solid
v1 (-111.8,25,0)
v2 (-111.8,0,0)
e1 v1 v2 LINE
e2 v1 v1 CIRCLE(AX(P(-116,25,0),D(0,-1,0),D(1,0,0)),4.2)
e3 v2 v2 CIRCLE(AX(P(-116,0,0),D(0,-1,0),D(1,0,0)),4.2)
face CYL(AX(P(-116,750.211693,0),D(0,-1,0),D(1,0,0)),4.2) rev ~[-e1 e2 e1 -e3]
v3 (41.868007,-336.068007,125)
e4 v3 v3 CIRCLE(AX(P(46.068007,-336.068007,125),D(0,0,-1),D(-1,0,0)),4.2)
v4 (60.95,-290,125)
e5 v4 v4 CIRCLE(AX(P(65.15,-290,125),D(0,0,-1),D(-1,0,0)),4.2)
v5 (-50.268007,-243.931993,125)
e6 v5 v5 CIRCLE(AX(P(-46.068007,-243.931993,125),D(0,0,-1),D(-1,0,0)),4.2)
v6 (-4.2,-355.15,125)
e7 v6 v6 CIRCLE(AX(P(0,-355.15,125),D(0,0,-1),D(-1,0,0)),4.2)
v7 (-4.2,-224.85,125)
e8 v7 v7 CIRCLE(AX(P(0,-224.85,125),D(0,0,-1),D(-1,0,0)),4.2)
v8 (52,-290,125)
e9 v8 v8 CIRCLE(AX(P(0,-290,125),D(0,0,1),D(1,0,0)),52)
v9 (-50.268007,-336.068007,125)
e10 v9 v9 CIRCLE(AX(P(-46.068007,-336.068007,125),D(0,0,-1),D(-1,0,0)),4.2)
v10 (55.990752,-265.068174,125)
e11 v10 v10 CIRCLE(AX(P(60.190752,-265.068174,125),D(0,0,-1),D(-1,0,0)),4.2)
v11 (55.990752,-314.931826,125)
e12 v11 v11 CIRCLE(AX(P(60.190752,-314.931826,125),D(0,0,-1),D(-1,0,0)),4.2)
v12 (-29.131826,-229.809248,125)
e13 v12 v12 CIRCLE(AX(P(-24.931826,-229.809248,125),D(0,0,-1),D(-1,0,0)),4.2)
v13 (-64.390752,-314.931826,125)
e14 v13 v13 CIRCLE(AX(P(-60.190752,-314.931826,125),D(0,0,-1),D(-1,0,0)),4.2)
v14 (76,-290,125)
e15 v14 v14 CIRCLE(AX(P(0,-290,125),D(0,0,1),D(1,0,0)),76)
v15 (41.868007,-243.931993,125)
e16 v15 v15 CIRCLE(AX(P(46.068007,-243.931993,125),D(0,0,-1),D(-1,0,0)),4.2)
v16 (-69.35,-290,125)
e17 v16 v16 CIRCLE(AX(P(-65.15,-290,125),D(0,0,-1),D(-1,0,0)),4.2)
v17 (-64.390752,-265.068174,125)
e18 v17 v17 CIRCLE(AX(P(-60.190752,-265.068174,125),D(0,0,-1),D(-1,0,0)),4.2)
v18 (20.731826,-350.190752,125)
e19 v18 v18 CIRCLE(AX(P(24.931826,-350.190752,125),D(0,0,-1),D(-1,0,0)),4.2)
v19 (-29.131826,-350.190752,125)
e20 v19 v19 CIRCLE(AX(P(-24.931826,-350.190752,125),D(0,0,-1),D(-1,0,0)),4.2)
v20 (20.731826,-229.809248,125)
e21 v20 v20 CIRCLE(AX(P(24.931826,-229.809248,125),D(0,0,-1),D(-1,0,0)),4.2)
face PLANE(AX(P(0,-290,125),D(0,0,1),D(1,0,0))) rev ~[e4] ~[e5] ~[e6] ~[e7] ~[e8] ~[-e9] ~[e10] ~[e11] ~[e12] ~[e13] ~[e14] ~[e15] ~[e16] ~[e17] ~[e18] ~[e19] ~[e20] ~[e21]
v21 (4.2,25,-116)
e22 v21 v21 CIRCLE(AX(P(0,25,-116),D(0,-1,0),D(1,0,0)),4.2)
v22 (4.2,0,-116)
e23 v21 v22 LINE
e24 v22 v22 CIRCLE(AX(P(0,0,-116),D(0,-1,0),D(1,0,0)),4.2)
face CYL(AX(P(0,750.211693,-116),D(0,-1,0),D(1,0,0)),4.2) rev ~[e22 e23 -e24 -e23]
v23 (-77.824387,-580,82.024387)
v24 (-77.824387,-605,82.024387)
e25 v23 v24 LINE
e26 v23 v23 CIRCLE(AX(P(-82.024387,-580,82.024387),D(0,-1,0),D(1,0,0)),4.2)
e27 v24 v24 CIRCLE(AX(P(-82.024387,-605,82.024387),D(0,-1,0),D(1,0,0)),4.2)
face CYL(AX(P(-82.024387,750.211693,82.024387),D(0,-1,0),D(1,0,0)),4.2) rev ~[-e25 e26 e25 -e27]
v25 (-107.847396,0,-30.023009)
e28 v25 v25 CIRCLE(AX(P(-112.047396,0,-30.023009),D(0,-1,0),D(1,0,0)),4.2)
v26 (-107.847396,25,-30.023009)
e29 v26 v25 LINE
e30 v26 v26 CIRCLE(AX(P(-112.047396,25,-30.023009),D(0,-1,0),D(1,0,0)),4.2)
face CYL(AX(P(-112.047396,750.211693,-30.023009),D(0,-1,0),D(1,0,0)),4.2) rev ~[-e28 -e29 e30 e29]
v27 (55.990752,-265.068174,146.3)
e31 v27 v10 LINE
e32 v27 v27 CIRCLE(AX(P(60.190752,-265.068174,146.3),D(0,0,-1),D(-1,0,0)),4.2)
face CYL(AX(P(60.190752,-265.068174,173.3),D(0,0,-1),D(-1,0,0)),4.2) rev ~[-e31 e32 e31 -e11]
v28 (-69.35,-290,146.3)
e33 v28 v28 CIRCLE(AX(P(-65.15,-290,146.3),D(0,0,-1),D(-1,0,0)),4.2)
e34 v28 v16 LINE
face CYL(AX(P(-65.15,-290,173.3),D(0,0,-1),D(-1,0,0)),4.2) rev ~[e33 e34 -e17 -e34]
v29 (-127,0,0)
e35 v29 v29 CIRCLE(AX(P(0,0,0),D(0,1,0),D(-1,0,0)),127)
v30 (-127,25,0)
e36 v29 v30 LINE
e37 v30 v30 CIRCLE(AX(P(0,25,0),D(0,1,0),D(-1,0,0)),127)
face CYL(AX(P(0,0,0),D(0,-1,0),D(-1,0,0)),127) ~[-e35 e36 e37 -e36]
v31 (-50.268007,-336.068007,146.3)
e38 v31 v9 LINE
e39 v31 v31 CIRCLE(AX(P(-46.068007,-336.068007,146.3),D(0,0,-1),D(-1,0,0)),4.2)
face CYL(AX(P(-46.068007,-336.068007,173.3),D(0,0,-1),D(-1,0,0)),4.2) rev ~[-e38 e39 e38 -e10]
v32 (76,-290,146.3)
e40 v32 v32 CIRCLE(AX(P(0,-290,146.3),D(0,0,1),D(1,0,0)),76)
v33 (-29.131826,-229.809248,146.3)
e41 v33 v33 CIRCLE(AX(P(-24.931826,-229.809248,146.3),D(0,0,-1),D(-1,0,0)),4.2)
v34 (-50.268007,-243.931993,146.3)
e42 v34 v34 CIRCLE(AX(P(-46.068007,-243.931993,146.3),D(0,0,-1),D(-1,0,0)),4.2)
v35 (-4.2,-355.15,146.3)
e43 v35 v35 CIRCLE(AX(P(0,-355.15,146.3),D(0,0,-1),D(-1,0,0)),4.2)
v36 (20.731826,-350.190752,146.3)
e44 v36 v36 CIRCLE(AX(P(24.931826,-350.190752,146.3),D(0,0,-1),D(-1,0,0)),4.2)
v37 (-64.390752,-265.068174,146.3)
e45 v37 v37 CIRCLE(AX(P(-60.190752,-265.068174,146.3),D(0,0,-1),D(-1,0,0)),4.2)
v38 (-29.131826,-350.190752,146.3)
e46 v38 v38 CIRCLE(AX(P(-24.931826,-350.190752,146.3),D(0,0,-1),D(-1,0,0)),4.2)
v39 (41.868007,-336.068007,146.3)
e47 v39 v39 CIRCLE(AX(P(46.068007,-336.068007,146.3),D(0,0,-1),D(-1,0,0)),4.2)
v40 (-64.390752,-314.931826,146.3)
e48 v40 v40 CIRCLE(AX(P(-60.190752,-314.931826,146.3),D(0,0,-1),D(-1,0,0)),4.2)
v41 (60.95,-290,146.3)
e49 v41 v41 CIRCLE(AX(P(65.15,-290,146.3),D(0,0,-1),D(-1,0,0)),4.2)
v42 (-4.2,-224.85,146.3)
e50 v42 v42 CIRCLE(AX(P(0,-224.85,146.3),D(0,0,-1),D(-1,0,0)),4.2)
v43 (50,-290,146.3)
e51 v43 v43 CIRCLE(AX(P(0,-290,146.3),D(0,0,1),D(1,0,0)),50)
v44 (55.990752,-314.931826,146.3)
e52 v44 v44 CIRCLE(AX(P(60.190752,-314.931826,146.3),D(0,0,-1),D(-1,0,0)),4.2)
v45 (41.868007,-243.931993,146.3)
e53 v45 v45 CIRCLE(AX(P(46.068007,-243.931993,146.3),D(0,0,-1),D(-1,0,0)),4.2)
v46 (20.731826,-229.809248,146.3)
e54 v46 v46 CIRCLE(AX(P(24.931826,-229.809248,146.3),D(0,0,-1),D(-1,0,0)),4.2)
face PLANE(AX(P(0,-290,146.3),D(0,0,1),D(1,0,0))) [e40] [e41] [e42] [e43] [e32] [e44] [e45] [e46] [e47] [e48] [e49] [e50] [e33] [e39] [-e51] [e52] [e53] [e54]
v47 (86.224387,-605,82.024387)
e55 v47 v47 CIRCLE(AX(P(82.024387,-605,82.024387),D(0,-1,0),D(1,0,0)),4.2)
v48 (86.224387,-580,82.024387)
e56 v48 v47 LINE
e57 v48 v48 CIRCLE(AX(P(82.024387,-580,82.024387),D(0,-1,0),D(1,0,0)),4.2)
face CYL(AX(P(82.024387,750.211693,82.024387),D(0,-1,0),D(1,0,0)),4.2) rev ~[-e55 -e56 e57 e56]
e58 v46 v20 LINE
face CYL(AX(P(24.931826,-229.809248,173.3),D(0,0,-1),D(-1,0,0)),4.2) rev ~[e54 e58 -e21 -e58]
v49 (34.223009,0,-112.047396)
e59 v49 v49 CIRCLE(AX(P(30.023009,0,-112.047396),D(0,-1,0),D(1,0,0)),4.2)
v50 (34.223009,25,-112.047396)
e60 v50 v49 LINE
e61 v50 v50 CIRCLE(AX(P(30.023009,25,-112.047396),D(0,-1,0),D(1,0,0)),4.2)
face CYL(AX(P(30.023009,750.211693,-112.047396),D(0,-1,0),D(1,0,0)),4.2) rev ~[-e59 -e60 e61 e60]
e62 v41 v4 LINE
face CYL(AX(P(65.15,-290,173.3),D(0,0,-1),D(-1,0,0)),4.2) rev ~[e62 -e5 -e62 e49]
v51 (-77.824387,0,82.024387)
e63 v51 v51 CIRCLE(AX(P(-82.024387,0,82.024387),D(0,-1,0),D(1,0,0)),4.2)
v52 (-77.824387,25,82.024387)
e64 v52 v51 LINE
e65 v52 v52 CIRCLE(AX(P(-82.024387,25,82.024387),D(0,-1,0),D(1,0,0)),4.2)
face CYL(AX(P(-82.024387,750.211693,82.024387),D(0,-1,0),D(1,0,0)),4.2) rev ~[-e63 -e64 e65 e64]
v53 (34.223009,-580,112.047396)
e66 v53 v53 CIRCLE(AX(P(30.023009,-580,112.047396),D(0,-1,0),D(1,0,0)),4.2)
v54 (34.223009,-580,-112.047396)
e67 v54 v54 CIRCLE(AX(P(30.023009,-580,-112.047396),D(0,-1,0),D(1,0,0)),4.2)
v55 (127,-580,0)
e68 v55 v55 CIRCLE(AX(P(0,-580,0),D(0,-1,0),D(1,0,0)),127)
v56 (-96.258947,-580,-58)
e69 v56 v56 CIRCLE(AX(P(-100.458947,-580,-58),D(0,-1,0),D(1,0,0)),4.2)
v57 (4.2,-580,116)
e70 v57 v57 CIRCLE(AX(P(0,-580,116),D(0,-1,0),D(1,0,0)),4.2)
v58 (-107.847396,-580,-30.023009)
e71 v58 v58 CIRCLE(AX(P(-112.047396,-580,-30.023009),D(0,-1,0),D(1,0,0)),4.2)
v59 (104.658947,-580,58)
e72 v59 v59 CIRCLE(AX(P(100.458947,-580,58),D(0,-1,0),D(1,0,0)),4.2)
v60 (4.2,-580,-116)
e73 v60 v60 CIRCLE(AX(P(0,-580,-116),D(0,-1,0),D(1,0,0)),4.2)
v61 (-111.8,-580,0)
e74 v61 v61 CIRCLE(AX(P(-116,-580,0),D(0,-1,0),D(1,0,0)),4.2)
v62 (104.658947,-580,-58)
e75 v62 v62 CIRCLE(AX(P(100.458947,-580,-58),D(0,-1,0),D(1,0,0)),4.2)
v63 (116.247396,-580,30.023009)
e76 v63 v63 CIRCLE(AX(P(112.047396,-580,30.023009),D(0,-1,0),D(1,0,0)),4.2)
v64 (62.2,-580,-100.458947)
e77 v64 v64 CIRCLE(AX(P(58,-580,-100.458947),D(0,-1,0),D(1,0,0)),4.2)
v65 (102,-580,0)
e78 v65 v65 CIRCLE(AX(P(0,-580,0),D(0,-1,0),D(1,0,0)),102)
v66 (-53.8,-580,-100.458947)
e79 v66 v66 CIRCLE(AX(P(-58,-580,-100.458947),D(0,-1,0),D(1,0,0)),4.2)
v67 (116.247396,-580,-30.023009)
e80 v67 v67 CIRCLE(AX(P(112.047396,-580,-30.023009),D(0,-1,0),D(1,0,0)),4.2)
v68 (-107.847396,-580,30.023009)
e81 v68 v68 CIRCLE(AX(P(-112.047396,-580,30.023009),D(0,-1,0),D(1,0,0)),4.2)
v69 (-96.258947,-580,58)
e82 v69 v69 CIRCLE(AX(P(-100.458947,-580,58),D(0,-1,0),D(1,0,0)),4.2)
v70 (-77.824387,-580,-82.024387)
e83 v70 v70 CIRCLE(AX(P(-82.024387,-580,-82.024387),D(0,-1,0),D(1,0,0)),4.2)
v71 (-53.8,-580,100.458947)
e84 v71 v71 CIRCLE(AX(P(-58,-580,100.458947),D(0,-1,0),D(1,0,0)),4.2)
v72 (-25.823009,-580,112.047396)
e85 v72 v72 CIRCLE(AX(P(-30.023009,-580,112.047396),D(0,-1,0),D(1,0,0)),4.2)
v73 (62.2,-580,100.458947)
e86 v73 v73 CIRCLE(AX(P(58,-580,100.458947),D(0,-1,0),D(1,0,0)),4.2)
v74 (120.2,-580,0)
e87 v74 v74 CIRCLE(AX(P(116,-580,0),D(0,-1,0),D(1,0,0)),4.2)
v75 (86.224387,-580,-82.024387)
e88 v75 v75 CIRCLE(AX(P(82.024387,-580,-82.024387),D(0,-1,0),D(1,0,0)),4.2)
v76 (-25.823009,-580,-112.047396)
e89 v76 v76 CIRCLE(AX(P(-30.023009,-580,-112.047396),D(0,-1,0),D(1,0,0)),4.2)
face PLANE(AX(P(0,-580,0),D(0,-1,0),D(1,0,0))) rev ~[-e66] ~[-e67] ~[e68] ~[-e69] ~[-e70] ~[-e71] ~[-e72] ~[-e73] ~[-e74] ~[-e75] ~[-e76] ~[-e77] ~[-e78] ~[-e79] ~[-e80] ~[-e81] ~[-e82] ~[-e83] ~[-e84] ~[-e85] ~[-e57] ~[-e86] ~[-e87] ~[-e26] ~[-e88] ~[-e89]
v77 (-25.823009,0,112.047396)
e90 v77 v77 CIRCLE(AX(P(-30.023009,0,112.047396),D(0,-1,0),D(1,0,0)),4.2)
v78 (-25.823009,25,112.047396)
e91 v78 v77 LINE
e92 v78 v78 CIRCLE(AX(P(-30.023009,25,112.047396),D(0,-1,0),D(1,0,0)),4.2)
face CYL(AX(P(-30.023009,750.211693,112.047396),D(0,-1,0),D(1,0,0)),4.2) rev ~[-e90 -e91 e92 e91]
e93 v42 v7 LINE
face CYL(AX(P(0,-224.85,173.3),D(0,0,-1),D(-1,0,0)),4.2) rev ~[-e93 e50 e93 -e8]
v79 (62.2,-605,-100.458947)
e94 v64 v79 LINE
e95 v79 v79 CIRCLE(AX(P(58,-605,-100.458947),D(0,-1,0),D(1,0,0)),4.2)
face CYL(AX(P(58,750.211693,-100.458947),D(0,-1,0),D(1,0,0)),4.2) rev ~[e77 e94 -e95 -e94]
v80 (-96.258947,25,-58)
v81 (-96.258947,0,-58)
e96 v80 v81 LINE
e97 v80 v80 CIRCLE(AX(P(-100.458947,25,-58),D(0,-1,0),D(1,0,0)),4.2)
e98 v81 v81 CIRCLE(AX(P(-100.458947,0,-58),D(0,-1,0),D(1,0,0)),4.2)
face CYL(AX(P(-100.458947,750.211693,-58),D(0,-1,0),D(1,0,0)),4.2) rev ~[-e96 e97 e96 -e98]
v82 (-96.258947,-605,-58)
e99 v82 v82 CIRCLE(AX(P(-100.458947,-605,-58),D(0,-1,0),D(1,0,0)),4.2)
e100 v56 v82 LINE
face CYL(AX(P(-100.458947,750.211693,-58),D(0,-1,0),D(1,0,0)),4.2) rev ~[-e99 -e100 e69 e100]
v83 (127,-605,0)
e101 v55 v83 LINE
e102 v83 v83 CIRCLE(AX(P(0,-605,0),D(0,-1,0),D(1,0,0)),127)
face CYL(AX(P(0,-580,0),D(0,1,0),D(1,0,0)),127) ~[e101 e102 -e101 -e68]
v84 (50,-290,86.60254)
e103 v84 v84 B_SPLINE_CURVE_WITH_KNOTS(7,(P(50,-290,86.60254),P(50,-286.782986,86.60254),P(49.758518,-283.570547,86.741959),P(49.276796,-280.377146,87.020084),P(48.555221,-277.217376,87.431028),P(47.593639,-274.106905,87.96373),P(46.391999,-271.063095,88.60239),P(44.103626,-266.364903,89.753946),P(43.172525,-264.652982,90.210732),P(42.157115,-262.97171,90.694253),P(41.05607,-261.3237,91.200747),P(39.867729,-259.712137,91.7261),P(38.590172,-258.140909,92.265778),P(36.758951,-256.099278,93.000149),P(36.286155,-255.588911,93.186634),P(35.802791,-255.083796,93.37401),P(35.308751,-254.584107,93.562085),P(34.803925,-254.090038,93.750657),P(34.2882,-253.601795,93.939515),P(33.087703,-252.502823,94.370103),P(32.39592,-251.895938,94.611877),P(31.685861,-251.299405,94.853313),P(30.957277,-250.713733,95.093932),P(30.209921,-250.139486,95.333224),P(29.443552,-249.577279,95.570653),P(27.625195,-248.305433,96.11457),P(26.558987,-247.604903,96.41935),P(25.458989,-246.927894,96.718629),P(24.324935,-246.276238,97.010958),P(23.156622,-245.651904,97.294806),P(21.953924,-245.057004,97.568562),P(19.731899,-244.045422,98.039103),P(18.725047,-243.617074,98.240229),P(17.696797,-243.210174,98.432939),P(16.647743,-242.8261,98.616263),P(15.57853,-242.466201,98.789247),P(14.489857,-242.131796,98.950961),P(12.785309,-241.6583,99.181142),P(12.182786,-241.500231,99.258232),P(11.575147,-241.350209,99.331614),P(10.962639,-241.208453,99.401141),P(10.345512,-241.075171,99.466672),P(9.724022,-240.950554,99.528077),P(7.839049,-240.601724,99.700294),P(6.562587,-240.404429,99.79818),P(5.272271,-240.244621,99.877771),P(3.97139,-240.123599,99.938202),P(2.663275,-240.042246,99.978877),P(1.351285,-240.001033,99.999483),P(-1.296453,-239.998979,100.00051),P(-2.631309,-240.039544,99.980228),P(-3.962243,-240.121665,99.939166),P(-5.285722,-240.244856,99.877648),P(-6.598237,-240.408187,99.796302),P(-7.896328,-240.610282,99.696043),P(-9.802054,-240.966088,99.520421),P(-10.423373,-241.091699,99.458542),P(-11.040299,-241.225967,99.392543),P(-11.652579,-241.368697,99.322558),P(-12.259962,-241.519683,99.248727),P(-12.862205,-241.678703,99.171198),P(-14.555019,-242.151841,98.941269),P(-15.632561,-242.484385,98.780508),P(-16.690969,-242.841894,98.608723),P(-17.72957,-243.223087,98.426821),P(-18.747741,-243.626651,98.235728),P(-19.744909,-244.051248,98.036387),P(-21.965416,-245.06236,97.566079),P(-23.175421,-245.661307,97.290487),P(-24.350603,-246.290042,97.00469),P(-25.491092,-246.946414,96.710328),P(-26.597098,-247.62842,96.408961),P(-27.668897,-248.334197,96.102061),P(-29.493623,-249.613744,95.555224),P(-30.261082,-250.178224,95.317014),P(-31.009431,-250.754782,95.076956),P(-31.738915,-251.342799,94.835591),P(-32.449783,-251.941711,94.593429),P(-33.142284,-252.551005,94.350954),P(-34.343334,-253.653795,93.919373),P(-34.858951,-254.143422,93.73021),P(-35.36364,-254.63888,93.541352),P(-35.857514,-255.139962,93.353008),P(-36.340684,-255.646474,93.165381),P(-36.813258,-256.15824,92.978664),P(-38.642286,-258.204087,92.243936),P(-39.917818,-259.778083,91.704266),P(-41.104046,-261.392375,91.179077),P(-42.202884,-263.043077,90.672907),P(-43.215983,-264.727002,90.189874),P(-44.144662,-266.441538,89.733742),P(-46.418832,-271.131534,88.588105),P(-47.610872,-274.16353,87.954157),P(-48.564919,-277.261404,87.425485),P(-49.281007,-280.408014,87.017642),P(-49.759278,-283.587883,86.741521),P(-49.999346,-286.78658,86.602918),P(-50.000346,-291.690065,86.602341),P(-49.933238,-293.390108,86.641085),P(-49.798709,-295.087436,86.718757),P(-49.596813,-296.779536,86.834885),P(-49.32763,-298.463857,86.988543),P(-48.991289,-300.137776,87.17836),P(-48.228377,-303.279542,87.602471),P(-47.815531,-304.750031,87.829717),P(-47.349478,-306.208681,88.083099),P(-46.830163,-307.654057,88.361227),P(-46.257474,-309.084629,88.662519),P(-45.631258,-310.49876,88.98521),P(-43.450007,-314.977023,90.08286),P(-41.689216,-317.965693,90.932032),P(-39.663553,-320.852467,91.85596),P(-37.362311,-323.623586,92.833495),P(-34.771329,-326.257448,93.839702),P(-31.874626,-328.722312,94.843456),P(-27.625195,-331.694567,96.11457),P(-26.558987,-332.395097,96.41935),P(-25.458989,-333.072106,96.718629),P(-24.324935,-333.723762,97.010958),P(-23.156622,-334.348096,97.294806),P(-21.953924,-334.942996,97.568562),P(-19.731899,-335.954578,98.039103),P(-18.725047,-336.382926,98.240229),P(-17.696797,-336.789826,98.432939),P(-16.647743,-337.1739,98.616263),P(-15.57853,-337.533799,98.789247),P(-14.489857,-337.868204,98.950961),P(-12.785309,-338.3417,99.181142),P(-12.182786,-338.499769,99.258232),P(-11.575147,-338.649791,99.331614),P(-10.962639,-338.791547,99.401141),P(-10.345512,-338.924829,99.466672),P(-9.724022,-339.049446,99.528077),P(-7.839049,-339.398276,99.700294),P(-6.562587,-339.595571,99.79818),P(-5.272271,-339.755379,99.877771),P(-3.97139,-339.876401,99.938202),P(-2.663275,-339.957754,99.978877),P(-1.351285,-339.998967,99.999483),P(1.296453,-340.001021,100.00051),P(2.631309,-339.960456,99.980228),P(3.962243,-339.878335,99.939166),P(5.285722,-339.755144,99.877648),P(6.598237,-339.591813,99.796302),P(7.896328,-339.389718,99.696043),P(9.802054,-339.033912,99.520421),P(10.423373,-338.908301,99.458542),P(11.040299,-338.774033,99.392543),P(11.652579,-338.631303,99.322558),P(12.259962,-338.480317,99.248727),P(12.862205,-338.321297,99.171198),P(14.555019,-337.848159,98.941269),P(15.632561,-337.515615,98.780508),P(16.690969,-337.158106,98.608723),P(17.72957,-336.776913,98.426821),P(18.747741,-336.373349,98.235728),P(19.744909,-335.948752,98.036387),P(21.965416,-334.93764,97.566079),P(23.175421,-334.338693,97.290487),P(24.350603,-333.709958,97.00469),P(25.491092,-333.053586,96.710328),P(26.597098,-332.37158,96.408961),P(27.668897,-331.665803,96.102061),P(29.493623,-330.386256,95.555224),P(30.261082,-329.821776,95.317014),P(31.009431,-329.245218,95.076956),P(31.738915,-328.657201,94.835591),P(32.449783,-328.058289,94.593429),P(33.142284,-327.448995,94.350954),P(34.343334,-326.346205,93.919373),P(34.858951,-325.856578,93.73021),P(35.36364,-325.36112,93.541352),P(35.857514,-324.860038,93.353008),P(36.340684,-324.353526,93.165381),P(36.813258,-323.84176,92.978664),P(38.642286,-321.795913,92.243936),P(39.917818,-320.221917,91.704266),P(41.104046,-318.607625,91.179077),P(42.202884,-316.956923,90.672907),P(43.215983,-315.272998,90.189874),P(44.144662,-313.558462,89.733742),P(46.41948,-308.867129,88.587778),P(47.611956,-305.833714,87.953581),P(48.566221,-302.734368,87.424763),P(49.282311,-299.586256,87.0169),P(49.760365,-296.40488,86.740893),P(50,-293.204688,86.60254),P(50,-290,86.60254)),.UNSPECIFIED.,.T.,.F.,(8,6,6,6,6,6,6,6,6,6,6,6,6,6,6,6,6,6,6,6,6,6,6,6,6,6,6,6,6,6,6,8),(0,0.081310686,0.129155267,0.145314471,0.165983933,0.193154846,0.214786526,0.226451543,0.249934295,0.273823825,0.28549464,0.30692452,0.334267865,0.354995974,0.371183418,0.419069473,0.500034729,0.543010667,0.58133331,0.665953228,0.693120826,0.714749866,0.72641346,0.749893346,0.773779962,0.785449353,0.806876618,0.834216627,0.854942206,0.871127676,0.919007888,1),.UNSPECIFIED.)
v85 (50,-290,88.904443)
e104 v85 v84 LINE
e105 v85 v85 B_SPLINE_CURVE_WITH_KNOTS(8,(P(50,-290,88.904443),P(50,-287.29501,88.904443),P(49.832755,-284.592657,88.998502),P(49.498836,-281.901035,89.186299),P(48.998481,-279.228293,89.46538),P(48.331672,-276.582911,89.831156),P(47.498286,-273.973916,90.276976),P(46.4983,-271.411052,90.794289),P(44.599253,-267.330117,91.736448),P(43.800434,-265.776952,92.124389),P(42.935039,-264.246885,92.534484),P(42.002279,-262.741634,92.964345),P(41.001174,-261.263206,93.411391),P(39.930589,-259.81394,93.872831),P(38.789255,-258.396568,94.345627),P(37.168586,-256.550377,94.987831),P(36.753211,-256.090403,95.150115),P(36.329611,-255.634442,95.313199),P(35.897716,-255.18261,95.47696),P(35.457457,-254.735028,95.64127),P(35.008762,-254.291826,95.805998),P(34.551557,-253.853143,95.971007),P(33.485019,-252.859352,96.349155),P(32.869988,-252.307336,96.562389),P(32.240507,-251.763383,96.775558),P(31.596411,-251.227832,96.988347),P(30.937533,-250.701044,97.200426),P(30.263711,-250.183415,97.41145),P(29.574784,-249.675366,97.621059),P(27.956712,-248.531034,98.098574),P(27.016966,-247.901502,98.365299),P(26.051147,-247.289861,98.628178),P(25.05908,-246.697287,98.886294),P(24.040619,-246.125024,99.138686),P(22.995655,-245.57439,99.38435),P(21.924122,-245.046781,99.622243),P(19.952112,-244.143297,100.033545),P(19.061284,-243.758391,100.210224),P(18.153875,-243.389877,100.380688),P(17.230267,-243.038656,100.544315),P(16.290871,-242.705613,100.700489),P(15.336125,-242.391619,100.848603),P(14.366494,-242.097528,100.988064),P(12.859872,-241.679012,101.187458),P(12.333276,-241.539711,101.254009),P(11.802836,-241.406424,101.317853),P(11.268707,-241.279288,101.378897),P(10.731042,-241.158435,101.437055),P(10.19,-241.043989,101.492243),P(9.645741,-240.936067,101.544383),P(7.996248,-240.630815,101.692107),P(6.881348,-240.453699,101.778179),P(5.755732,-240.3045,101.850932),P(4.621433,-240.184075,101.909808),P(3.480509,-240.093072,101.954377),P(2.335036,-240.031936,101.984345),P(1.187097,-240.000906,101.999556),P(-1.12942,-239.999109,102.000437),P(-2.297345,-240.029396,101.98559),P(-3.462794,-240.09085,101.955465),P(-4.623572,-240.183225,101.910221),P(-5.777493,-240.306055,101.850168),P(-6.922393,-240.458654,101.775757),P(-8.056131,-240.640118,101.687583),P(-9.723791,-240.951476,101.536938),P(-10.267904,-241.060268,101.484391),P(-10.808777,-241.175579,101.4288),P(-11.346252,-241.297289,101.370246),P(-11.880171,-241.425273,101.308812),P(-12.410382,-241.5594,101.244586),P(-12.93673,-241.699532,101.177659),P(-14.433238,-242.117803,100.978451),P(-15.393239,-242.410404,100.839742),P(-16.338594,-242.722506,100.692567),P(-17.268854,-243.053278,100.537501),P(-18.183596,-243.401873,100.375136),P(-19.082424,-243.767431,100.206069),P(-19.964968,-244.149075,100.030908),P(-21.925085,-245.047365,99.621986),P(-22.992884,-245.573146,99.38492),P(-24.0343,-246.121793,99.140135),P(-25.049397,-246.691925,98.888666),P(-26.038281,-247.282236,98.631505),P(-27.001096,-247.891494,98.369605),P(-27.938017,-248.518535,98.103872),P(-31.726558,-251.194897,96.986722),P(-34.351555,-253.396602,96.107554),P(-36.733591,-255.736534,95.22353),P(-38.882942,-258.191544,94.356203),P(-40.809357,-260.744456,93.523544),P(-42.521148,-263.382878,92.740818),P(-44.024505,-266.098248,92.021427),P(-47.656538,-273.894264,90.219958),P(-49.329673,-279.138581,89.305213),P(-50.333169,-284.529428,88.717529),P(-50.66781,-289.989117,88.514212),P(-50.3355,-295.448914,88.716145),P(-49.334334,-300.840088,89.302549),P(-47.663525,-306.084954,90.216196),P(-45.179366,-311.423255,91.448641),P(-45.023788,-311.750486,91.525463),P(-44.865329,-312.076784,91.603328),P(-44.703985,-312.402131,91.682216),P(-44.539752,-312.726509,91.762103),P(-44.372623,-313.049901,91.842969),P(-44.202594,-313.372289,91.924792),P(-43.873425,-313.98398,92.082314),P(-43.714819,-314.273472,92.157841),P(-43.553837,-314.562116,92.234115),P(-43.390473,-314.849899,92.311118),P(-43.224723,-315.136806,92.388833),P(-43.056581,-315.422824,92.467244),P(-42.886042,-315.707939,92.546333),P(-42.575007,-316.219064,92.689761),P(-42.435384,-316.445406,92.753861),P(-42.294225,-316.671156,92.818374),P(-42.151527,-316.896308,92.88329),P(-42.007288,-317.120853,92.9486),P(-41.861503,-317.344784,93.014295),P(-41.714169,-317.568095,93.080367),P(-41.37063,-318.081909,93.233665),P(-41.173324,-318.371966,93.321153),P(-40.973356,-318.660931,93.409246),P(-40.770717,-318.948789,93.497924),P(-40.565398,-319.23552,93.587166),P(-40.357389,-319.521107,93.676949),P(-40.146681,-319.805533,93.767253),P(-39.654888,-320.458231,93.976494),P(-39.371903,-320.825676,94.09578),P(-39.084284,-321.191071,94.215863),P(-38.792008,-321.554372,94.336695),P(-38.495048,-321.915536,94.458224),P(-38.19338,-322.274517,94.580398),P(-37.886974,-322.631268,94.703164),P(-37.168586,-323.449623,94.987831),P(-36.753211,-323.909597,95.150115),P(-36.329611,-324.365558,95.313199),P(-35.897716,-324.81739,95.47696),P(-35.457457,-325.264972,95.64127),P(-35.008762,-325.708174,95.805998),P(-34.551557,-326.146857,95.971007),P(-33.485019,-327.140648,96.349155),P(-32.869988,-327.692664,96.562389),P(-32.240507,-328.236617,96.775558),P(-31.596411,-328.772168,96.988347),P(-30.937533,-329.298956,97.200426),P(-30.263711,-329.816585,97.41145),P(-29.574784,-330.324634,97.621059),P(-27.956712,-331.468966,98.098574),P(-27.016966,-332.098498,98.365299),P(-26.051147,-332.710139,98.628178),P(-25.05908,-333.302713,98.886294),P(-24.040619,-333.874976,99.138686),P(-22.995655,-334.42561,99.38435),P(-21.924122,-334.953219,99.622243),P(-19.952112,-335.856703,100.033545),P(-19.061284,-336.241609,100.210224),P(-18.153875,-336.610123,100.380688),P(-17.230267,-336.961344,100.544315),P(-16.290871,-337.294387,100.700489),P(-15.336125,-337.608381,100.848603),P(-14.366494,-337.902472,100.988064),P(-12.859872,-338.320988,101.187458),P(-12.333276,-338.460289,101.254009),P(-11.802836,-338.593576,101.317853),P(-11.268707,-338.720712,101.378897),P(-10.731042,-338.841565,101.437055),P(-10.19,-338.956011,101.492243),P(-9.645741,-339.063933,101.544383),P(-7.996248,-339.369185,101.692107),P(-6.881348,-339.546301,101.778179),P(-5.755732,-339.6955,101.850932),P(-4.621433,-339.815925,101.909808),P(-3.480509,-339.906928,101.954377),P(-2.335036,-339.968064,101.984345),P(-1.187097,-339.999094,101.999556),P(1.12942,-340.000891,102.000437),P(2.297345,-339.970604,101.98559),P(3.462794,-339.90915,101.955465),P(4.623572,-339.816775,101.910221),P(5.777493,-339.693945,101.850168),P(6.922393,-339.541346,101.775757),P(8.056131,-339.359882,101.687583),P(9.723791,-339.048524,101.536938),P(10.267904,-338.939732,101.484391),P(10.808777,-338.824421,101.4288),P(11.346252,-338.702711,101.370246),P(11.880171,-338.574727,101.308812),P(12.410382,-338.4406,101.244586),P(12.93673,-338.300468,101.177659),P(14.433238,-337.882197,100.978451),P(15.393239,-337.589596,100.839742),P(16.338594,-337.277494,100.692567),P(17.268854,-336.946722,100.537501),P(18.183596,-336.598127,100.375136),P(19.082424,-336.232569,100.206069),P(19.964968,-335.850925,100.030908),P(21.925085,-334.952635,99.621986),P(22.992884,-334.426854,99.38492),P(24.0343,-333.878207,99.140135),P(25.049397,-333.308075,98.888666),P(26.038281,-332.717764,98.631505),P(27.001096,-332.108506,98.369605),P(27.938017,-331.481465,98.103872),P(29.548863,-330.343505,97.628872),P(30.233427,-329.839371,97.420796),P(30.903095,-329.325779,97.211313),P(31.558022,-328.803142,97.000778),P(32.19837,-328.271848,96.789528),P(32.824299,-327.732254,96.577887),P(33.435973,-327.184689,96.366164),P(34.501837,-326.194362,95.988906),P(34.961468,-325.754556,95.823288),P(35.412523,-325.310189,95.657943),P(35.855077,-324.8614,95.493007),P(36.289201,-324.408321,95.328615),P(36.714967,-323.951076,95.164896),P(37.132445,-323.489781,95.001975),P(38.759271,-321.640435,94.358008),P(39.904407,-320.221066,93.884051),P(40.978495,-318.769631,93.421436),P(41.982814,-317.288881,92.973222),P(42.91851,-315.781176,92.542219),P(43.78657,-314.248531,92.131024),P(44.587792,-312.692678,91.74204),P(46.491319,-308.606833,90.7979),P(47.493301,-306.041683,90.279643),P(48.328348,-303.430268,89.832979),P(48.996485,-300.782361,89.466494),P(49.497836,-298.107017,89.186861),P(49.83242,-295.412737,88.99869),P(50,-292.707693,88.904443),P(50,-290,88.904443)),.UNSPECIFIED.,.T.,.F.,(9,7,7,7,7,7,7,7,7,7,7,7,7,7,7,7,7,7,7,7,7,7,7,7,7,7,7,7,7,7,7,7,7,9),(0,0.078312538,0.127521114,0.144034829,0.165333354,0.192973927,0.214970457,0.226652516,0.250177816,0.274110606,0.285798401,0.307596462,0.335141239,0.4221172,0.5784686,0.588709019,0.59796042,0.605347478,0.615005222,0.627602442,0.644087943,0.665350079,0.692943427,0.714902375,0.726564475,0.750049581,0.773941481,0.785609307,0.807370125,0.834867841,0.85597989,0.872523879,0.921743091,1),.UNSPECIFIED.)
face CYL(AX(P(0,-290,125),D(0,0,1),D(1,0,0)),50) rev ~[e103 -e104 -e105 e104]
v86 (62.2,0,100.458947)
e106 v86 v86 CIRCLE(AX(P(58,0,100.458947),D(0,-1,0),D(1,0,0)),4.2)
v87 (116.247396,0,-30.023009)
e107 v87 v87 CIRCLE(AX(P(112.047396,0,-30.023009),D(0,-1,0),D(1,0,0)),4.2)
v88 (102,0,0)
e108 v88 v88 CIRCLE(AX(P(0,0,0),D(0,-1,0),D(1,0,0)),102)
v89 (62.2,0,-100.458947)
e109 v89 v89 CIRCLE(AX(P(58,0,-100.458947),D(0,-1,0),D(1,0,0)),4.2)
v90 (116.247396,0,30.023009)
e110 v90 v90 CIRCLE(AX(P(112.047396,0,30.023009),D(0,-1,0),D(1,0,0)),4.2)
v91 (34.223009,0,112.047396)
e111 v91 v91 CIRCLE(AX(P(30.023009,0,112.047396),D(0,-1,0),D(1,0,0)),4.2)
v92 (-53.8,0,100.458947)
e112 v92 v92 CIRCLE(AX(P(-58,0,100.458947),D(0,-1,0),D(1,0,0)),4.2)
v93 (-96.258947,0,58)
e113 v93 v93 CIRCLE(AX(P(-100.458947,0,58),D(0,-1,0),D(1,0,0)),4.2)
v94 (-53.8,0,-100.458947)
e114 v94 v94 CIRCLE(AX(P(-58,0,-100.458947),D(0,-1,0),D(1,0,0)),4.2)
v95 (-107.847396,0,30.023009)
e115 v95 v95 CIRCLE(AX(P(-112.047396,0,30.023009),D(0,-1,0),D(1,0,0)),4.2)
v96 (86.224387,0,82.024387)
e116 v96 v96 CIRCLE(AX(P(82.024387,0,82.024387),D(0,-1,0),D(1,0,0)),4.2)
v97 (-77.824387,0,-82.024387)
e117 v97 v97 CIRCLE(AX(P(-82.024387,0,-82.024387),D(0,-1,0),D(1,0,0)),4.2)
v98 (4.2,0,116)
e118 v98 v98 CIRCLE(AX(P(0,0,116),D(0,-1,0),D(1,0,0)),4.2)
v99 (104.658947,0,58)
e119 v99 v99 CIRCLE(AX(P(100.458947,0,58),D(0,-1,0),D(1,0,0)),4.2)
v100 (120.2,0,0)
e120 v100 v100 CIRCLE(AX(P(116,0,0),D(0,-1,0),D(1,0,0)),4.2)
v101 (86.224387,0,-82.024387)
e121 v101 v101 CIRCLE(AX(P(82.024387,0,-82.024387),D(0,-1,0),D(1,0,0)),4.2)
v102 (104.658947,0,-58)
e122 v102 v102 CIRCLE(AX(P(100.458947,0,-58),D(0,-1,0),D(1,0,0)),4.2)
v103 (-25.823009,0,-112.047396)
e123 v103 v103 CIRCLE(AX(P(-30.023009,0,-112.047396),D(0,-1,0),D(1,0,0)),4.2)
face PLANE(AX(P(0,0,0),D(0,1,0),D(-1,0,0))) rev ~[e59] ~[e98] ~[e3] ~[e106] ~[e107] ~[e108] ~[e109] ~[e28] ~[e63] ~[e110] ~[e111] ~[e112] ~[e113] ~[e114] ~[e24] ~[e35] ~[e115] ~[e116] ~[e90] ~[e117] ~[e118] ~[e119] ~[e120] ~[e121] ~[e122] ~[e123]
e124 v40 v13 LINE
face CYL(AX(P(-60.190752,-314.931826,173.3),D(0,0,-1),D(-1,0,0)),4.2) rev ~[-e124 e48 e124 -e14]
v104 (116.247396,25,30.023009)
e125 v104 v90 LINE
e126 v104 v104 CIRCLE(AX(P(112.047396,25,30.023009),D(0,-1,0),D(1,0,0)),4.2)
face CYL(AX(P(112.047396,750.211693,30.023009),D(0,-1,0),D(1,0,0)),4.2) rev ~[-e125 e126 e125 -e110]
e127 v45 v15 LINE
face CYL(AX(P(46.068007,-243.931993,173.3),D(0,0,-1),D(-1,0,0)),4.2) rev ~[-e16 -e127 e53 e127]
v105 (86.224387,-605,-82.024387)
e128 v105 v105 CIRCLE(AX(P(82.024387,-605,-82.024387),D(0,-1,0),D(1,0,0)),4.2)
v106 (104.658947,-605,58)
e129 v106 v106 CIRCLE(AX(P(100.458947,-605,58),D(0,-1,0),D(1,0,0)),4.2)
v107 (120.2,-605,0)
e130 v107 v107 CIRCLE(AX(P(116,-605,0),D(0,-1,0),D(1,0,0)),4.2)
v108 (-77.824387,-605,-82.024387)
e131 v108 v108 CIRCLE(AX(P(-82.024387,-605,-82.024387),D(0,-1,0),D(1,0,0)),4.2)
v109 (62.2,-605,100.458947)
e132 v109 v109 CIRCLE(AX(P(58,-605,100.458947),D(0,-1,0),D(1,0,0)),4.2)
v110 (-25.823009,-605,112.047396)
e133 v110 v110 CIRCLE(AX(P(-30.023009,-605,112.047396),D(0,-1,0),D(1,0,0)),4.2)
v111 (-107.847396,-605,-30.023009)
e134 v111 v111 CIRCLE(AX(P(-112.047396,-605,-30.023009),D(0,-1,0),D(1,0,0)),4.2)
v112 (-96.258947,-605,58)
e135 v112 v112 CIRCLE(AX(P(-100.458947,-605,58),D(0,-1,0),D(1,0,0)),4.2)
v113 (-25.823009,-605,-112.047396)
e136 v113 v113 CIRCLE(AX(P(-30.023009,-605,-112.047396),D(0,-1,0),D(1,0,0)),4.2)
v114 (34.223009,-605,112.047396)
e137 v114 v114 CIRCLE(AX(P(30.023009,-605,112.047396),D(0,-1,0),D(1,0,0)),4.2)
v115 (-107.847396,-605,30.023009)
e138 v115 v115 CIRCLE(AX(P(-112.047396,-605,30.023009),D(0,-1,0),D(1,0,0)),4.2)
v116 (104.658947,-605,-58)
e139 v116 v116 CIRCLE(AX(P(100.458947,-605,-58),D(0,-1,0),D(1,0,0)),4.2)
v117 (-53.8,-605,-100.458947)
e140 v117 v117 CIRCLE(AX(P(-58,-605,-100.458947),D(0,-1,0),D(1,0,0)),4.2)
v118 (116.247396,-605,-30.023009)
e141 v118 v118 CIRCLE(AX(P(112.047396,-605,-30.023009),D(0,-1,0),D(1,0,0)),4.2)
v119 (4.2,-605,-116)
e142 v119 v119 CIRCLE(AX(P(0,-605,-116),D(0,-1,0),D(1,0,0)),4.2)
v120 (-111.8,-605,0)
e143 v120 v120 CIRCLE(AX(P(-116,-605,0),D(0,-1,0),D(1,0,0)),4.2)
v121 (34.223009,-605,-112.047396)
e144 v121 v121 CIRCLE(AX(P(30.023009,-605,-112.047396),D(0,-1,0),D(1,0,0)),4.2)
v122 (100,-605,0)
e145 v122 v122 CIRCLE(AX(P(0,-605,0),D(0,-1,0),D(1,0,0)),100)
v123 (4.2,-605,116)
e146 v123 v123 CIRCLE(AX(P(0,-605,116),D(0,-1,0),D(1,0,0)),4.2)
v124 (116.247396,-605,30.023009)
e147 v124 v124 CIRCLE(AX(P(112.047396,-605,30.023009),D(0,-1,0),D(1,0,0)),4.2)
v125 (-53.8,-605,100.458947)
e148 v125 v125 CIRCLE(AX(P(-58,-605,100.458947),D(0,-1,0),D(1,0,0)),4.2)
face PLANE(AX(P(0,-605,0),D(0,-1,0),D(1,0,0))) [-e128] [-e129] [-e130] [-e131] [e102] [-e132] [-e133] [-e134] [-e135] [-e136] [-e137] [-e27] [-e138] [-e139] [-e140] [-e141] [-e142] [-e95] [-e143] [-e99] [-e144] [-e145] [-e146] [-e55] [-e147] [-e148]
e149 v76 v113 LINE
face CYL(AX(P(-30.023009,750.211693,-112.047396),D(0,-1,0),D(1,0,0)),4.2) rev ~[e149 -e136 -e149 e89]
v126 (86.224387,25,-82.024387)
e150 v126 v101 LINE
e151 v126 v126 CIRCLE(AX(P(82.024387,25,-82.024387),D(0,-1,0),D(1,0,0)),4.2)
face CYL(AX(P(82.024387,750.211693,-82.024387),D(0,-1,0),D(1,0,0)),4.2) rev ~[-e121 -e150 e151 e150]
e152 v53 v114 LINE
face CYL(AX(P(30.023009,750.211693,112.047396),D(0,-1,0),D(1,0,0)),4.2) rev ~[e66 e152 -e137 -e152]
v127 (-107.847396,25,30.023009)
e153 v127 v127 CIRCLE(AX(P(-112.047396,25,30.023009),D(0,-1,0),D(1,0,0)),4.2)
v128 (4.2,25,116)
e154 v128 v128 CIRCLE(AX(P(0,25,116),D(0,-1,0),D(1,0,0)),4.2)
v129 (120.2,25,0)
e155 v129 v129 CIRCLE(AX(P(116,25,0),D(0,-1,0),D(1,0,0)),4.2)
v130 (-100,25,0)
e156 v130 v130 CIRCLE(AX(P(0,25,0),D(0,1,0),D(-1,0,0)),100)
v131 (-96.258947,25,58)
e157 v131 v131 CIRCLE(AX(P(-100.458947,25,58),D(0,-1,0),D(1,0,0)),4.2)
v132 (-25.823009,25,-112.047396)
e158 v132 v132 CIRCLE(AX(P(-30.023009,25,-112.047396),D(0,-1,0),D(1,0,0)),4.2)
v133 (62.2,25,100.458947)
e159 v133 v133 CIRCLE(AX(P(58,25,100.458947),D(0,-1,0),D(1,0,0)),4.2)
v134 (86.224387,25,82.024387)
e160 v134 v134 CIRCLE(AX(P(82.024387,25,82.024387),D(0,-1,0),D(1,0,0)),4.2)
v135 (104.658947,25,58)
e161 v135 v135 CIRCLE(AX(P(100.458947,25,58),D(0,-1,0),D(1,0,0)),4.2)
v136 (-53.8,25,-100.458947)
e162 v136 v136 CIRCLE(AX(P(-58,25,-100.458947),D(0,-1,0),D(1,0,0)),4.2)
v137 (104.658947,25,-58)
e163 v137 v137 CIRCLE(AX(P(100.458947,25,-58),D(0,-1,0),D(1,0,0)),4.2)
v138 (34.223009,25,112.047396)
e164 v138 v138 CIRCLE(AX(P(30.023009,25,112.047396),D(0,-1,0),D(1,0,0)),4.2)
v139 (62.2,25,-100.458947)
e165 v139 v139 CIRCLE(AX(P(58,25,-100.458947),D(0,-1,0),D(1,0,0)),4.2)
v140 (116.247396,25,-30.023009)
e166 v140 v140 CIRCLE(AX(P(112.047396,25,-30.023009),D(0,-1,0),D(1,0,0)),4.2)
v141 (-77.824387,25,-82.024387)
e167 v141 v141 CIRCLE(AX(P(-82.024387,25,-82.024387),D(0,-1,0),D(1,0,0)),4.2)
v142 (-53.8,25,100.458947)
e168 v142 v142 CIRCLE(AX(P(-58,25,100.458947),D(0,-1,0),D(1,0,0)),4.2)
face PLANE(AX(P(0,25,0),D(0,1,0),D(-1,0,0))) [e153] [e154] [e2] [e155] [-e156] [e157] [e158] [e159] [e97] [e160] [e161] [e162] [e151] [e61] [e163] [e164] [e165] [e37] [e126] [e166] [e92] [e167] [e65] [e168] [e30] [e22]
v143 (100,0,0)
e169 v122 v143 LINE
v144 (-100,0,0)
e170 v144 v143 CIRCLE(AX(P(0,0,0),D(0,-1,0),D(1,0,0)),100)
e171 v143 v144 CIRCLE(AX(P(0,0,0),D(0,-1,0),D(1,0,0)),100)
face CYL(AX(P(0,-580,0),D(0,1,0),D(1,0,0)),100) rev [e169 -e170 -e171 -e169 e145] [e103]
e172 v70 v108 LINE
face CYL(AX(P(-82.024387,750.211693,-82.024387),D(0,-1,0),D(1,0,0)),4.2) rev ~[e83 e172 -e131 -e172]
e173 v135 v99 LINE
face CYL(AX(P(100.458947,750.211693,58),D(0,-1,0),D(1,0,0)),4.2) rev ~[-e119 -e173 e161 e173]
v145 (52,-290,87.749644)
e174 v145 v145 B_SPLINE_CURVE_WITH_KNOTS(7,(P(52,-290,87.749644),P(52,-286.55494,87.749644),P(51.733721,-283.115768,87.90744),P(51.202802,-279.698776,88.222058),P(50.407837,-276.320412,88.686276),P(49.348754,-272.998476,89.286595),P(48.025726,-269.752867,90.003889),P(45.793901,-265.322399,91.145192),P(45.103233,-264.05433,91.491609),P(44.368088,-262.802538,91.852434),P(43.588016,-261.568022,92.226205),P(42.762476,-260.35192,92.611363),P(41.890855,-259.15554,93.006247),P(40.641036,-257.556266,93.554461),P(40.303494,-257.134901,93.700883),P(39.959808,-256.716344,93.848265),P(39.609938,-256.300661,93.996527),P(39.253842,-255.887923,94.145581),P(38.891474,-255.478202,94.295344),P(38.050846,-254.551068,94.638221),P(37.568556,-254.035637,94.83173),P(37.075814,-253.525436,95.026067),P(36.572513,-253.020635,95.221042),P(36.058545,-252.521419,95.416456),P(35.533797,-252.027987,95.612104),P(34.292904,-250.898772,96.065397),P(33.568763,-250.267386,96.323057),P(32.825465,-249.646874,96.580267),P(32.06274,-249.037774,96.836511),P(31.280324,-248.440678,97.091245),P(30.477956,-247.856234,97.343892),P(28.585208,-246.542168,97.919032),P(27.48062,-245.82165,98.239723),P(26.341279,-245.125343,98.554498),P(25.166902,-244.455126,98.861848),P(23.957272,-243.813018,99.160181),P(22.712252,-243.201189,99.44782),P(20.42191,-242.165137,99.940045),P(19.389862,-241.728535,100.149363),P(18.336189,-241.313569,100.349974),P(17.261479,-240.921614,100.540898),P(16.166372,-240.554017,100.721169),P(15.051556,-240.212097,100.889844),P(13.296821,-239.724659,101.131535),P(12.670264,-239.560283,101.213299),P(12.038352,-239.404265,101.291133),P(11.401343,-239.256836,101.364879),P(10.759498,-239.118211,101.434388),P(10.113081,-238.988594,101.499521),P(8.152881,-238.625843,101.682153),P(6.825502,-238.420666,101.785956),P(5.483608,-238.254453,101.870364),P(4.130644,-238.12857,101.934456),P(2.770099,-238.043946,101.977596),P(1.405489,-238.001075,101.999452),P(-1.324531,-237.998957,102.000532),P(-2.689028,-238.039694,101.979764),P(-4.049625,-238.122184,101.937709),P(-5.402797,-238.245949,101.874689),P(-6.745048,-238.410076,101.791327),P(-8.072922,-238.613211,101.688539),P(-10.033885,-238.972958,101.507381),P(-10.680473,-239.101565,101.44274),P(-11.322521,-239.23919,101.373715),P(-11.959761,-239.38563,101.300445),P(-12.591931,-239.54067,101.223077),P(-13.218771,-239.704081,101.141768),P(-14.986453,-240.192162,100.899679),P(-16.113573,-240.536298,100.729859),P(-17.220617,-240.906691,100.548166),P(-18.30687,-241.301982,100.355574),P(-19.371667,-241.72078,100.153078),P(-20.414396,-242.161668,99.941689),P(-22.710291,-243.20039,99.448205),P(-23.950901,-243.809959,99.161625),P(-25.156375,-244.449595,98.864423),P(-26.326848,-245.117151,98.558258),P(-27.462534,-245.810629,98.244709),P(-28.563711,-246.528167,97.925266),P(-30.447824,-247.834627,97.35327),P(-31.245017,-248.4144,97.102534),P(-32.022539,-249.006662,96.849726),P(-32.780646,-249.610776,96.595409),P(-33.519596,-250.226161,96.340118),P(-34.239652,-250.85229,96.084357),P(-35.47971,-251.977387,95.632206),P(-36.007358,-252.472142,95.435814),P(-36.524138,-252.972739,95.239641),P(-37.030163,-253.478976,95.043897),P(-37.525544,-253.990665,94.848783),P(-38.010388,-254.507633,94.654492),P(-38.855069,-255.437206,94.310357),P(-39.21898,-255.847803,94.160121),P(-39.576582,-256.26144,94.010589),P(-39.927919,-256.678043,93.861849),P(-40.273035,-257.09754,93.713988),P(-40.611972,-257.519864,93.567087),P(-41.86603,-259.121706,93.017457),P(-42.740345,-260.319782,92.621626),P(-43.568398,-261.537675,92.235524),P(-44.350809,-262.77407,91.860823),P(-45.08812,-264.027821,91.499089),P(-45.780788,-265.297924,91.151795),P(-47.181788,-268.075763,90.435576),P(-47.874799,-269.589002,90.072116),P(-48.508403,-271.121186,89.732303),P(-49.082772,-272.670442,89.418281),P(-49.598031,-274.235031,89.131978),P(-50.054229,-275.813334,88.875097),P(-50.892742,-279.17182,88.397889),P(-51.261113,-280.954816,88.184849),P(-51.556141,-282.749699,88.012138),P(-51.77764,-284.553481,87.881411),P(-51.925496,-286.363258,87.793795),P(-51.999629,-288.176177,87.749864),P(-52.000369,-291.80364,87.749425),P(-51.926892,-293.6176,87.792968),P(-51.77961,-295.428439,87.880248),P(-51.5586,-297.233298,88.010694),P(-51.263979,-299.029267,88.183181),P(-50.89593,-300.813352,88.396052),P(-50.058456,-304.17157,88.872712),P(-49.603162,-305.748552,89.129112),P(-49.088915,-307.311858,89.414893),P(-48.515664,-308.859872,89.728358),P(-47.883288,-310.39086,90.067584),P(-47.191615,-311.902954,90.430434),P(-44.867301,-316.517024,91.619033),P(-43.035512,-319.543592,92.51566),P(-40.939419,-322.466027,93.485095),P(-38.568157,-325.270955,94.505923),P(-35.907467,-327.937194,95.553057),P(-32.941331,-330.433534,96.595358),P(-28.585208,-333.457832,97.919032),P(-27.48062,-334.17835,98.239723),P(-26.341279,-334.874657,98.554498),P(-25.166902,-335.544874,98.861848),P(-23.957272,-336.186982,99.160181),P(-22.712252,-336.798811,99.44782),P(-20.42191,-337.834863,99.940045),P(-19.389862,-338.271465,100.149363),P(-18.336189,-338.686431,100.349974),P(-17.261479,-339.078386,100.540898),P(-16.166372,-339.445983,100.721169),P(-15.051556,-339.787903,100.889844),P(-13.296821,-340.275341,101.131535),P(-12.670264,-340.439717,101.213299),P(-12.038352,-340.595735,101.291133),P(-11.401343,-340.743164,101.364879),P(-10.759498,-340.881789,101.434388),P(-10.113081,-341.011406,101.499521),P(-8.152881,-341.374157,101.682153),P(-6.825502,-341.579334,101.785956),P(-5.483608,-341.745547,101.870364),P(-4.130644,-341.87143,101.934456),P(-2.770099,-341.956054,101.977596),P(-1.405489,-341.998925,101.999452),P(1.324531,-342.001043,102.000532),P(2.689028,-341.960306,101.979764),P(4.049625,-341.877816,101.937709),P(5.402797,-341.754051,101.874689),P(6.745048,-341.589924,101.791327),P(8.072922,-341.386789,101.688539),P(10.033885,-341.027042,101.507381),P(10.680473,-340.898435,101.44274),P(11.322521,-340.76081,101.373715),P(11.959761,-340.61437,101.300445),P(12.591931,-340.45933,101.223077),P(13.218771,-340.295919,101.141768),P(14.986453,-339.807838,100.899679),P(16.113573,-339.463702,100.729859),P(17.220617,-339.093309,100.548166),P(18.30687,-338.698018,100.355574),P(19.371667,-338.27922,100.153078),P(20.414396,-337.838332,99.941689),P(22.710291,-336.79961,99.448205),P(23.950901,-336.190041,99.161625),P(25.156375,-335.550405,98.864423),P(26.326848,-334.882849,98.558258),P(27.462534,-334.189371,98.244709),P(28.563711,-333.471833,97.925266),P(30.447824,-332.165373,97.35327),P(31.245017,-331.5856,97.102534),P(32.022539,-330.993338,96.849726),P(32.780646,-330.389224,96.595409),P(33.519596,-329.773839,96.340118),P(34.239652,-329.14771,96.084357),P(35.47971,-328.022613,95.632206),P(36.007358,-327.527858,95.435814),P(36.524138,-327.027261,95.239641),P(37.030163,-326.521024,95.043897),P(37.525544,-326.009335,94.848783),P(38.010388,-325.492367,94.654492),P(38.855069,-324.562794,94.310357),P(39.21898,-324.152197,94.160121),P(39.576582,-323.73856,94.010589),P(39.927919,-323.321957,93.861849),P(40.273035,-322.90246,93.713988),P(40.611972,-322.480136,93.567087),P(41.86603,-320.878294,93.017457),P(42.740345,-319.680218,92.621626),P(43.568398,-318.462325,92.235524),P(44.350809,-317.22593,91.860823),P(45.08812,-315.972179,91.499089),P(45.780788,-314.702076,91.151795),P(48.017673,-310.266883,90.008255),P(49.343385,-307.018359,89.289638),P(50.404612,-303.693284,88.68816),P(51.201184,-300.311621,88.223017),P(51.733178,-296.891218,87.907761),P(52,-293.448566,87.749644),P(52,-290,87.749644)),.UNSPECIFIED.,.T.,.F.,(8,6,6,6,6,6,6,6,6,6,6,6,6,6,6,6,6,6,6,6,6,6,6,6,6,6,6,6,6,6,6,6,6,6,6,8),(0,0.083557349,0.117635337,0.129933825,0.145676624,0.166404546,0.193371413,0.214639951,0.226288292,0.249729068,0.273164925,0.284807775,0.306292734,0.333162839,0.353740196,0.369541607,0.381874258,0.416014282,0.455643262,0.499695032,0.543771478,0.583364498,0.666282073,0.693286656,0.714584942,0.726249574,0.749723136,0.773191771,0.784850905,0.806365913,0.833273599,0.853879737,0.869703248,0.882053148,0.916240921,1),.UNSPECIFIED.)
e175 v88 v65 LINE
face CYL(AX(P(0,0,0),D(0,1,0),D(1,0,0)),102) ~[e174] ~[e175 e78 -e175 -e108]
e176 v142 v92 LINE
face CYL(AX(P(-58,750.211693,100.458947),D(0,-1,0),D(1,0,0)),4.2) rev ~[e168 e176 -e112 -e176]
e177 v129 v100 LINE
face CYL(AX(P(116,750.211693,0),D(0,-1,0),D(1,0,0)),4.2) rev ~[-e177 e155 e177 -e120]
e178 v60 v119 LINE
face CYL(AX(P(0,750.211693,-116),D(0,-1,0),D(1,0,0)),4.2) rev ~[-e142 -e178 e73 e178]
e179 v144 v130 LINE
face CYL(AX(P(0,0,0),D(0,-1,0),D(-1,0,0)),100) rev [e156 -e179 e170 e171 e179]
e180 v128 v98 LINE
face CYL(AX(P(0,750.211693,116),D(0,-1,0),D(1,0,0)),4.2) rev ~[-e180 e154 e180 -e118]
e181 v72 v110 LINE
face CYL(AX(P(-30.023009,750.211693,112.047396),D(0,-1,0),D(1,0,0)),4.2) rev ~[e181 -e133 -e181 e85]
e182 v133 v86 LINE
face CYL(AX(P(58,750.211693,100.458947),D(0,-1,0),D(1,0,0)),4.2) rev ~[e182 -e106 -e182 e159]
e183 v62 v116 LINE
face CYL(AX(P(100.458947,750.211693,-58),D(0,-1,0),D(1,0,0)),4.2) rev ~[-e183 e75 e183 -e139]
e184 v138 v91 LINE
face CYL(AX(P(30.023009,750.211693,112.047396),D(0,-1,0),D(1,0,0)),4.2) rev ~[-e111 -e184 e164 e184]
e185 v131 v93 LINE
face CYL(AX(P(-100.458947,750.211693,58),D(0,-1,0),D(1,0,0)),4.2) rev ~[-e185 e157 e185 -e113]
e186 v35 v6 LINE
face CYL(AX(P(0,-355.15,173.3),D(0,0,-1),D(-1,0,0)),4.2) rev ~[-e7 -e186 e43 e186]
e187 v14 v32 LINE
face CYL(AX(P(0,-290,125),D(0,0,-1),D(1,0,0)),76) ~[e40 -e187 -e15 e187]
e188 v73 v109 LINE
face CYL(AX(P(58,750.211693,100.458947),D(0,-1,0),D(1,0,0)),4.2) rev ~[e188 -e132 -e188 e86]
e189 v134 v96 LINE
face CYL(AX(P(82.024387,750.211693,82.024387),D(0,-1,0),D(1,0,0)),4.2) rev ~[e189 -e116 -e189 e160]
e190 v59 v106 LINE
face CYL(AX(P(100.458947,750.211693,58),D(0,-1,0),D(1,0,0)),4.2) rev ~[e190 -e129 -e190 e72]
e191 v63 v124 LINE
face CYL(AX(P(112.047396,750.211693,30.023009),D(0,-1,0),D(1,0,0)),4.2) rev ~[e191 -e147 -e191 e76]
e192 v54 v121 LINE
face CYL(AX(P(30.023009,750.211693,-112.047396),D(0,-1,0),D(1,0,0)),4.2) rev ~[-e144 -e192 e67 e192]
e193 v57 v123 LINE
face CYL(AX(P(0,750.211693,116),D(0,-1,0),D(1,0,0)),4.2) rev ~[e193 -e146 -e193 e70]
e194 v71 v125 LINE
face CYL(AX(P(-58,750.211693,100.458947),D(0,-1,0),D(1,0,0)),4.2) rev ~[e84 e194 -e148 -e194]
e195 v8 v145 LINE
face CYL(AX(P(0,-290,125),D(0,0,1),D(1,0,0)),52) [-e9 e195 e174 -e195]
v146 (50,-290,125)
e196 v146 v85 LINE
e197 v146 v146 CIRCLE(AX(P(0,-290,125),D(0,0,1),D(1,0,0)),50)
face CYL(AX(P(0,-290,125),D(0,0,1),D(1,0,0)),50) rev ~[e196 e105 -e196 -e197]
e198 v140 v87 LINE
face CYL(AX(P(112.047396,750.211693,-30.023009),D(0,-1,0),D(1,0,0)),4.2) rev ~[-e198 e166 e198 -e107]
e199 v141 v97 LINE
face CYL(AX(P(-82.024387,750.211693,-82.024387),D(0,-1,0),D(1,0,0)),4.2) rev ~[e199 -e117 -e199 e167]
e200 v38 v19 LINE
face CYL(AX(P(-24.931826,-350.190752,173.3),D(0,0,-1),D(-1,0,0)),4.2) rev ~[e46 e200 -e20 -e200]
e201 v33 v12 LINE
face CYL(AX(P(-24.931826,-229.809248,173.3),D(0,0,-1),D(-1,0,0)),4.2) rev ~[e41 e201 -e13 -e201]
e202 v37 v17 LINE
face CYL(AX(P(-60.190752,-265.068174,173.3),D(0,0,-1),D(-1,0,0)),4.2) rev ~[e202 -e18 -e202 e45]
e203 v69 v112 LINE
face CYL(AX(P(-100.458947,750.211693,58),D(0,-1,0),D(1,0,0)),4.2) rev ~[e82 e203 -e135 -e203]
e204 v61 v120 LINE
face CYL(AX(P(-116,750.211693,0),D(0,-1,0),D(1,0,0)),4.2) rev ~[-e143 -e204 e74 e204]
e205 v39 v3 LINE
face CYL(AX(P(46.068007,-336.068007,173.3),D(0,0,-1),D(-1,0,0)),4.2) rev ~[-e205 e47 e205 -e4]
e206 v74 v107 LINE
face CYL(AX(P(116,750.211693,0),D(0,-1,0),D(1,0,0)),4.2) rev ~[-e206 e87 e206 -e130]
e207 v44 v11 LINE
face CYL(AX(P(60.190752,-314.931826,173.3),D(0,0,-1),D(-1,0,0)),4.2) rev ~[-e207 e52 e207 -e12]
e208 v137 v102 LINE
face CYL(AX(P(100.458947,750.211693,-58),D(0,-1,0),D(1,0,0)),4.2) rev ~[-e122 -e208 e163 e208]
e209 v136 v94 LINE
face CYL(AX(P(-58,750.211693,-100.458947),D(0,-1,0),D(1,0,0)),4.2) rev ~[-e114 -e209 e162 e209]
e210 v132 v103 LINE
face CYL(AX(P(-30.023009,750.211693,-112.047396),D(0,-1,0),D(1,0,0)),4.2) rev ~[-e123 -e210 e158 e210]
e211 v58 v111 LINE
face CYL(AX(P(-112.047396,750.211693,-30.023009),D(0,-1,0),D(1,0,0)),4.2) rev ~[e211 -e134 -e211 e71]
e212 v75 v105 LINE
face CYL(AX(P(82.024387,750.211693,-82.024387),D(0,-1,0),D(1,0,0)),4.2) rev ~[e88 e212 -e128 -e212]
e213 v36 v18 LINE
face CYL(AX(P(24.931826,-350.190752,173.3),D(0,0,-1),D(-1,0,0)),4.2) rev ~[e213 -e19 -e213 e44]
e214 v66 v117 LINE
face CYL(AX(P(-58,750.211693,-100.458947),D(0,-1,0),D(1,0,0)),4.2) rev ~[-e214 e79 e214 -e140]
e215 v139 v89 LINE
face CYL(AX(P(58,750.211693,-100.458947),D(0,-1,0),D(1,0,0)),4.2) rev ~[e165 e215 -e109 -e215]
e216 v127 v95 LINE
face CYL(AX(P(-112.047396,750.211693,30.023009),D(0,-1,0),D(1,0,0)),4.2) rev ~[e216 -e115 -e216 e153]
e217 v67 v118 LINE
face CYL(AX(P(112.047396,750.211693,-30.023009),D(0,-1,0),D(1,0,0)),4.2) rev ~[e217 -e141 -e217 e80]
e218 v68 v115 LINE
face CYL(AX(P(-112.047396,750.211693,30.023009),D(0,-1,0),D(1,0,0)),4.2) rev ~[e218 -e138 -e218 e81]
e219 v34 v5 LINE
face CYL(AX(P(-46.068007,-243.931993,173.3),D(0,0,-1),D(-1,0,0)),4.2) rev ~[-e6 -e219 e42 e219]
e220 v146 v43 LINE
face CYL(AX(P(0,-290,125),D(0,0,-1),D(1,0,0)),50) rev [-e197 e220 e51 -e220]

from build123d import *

# Parameters (mm, degrees)
F0_R      = 102
F0_R_2    = 100
F1_DEPTH  = 580
F2_R      = 127
F2_R_2    = 102
F2_R_3    = 100
F3_DEPTH  = 25
F4_R      = 127
F4_R_2    = 102
F4_R_3    = 100
F5_DEPTH  = 25
F7_D      = 8.4
F9_R      = 52
F9_R_2    = 50
F10_REACH = 399.0792104868
F11_REACH = 393.4223562373
F9_R_3    = 76
F12_DEPTH = 21.3
F14_D     = 8.4
F14_DEPTH = 27
F14_TIP   = 2.5236145999


with BuildPart() as f1:
    # F0 (on Front) → F1 (new body)
    with BuildSketch(Plane.XZ):
        Circle(F0_R)
        Circle(F0_R_2, mode=Mode.SUBTRACT)
    extrude(amount=F1_DEPTH)

    # F2 (on face) → F3 (join)
    with BuildSketch(Plane.XZ.offset(580)):
        Circle(F2_R)
        Circle(F2_R_2, mode=Mode.SUBTRACT)
        Circle(F2_R_2)
        Circle(F2_R_3, mode=Mode.SUBTRACT)
    extrude(amount=F3_DEPTH)

    # F4 (on face) → F5 (join)
    with BuildSketch(Plane(origin=(0, 0, 0), x_dir=(-1, 0, 0), z_dir=(0, 1, 0))):
        Circle(F4_R)
        Circle(F4_R_2, mode=Mode.SUBTRACT)
        Circle(F4_R_2)
        Circle(F4_R_3, mode=Mode.SUBTRACT)
    extrude(amount=F5_DEPTH)

    # F7 (through all)
    with Locations(Plane(origin=(0, 25, 0), x_dir=(-1, 0, 0), z_dir=(0, 1, 0))):
        with Locations((0, 116), (30.0230092319, 112.0473958495), (58, 100.458946839), (82.0243866176, 82.0243866176), (100.458946839, 58), (112.0473958495, 30.0230092319), (116, 0), (112.0473958495, -30.0230092319), (100.458946839, -58), (82.0243866176, -82.0243866176), (58, -100.458946839), (30.0230092319, -112.0473958495), (0, -116), (-30.0230092319, -112.0473958495), (-58, -100.458946839), (-82.0243866176, -82.0243866176), (-100.458946839, -58), (-112.0473958495, -30.0230092319), (-116, 0), (-112.0473958495, 30.0230092319), (-100.458946839, 58), (-82.0243866176, 82.0243866176), (-58, 100.458946839), (-30.0230092319, 112.0473958495)):
            Hole(F7_D / 2)

    f10_end = f1.faces().sort_by_distance((-102, -290, 0))[0]
    # F9 (on offset) → F10 (join, up to a face of the model that its end follows)
    with BuildSketch(Plane.XY.offset(125)):
        with Locations((0, -290)):
            Circle(F9_R)
        with Locations((0, -290)):
            Circle(F9_R_2, mode=Mode.SUBTRACT)
    f10_long = extrude(amount=-F10_REACH, mode=Mode.PRIVATE)
    add(split(f10_long, bisect_by=f10_end, keep=Keep.ALL, mode=Mode.PRIVATE).solids().sort_by_distance((-50.5292178951, -290, 125))[0])

    f11_end = f1.faces().sort_by_distance((-100, -302.5, 0))[0]
    # F9 (on offset) → F11 (cut, up to a face of the model that its end follows)
    with BuildSketch(Plane.XY.offset(125)):
        with Locations((0, -290)):
            Circle(F9_R_2)
    f11_long = extrude(amount=-F11_REACH, mode=Mode.PRIVATE)
    add(split(f11_long, bisect_by=f11_end, keep=Keep.ALL, mode=Mode.PRIVATE).solids().sort_by_distance((0, -290, 125))[0], mode=Mode.SUBTRACT)

    # F9 (on offset) → F12 (join)
    with BuildSketch(Plane.XY.offset(125)):
        with Locations((0, -290)):
            Circle(F9_R_3)
        with Locations((0, -290)):
            Circle(F9_R, mode=Mode.SUBTRACT)
        with Locations((0, -290)):
            Circle(F9_R)
        with Locations((0, -290)):
            Circle(F9_R_2, mode=Mode.SUBTRACT)
    extrude(amount=F12_DEPTH)

    # F14
    with Locations(Plane.XY.offset(146.3)):
        with Locations((0, -224.85), (24.9318256186, -229.8092484569), (46.0680067943, -243.9319932057), (60.1907515431, -265.0681743814), (65.15, -290), (60.1907515431, -314.9318256186), (46.0680067943, -336.0680067943), (24.9318256186, -350.1907515431), (0, -355.15), (-24.9318256186, -350.1907515431), (-46.0680067943, -336.0680067943), (-60.1907515431, -314.9318256186), (-65.15, -290), (-60.1907515431, -265.0681743814), (-46.0680067943, -243.9319932057), (-24.9318256186, -229.8092484569)):
            Hole(F14_D / 2, depth=F14_DEPTH)
            with Locations((0, 0, -(F14_DEPTH + F14_TIP / 2))):  # 118° drill point
                Cone(0, F14_D / 2, F14_TIP, mode=Mode.SUBTRACT)


solid = f1.part
